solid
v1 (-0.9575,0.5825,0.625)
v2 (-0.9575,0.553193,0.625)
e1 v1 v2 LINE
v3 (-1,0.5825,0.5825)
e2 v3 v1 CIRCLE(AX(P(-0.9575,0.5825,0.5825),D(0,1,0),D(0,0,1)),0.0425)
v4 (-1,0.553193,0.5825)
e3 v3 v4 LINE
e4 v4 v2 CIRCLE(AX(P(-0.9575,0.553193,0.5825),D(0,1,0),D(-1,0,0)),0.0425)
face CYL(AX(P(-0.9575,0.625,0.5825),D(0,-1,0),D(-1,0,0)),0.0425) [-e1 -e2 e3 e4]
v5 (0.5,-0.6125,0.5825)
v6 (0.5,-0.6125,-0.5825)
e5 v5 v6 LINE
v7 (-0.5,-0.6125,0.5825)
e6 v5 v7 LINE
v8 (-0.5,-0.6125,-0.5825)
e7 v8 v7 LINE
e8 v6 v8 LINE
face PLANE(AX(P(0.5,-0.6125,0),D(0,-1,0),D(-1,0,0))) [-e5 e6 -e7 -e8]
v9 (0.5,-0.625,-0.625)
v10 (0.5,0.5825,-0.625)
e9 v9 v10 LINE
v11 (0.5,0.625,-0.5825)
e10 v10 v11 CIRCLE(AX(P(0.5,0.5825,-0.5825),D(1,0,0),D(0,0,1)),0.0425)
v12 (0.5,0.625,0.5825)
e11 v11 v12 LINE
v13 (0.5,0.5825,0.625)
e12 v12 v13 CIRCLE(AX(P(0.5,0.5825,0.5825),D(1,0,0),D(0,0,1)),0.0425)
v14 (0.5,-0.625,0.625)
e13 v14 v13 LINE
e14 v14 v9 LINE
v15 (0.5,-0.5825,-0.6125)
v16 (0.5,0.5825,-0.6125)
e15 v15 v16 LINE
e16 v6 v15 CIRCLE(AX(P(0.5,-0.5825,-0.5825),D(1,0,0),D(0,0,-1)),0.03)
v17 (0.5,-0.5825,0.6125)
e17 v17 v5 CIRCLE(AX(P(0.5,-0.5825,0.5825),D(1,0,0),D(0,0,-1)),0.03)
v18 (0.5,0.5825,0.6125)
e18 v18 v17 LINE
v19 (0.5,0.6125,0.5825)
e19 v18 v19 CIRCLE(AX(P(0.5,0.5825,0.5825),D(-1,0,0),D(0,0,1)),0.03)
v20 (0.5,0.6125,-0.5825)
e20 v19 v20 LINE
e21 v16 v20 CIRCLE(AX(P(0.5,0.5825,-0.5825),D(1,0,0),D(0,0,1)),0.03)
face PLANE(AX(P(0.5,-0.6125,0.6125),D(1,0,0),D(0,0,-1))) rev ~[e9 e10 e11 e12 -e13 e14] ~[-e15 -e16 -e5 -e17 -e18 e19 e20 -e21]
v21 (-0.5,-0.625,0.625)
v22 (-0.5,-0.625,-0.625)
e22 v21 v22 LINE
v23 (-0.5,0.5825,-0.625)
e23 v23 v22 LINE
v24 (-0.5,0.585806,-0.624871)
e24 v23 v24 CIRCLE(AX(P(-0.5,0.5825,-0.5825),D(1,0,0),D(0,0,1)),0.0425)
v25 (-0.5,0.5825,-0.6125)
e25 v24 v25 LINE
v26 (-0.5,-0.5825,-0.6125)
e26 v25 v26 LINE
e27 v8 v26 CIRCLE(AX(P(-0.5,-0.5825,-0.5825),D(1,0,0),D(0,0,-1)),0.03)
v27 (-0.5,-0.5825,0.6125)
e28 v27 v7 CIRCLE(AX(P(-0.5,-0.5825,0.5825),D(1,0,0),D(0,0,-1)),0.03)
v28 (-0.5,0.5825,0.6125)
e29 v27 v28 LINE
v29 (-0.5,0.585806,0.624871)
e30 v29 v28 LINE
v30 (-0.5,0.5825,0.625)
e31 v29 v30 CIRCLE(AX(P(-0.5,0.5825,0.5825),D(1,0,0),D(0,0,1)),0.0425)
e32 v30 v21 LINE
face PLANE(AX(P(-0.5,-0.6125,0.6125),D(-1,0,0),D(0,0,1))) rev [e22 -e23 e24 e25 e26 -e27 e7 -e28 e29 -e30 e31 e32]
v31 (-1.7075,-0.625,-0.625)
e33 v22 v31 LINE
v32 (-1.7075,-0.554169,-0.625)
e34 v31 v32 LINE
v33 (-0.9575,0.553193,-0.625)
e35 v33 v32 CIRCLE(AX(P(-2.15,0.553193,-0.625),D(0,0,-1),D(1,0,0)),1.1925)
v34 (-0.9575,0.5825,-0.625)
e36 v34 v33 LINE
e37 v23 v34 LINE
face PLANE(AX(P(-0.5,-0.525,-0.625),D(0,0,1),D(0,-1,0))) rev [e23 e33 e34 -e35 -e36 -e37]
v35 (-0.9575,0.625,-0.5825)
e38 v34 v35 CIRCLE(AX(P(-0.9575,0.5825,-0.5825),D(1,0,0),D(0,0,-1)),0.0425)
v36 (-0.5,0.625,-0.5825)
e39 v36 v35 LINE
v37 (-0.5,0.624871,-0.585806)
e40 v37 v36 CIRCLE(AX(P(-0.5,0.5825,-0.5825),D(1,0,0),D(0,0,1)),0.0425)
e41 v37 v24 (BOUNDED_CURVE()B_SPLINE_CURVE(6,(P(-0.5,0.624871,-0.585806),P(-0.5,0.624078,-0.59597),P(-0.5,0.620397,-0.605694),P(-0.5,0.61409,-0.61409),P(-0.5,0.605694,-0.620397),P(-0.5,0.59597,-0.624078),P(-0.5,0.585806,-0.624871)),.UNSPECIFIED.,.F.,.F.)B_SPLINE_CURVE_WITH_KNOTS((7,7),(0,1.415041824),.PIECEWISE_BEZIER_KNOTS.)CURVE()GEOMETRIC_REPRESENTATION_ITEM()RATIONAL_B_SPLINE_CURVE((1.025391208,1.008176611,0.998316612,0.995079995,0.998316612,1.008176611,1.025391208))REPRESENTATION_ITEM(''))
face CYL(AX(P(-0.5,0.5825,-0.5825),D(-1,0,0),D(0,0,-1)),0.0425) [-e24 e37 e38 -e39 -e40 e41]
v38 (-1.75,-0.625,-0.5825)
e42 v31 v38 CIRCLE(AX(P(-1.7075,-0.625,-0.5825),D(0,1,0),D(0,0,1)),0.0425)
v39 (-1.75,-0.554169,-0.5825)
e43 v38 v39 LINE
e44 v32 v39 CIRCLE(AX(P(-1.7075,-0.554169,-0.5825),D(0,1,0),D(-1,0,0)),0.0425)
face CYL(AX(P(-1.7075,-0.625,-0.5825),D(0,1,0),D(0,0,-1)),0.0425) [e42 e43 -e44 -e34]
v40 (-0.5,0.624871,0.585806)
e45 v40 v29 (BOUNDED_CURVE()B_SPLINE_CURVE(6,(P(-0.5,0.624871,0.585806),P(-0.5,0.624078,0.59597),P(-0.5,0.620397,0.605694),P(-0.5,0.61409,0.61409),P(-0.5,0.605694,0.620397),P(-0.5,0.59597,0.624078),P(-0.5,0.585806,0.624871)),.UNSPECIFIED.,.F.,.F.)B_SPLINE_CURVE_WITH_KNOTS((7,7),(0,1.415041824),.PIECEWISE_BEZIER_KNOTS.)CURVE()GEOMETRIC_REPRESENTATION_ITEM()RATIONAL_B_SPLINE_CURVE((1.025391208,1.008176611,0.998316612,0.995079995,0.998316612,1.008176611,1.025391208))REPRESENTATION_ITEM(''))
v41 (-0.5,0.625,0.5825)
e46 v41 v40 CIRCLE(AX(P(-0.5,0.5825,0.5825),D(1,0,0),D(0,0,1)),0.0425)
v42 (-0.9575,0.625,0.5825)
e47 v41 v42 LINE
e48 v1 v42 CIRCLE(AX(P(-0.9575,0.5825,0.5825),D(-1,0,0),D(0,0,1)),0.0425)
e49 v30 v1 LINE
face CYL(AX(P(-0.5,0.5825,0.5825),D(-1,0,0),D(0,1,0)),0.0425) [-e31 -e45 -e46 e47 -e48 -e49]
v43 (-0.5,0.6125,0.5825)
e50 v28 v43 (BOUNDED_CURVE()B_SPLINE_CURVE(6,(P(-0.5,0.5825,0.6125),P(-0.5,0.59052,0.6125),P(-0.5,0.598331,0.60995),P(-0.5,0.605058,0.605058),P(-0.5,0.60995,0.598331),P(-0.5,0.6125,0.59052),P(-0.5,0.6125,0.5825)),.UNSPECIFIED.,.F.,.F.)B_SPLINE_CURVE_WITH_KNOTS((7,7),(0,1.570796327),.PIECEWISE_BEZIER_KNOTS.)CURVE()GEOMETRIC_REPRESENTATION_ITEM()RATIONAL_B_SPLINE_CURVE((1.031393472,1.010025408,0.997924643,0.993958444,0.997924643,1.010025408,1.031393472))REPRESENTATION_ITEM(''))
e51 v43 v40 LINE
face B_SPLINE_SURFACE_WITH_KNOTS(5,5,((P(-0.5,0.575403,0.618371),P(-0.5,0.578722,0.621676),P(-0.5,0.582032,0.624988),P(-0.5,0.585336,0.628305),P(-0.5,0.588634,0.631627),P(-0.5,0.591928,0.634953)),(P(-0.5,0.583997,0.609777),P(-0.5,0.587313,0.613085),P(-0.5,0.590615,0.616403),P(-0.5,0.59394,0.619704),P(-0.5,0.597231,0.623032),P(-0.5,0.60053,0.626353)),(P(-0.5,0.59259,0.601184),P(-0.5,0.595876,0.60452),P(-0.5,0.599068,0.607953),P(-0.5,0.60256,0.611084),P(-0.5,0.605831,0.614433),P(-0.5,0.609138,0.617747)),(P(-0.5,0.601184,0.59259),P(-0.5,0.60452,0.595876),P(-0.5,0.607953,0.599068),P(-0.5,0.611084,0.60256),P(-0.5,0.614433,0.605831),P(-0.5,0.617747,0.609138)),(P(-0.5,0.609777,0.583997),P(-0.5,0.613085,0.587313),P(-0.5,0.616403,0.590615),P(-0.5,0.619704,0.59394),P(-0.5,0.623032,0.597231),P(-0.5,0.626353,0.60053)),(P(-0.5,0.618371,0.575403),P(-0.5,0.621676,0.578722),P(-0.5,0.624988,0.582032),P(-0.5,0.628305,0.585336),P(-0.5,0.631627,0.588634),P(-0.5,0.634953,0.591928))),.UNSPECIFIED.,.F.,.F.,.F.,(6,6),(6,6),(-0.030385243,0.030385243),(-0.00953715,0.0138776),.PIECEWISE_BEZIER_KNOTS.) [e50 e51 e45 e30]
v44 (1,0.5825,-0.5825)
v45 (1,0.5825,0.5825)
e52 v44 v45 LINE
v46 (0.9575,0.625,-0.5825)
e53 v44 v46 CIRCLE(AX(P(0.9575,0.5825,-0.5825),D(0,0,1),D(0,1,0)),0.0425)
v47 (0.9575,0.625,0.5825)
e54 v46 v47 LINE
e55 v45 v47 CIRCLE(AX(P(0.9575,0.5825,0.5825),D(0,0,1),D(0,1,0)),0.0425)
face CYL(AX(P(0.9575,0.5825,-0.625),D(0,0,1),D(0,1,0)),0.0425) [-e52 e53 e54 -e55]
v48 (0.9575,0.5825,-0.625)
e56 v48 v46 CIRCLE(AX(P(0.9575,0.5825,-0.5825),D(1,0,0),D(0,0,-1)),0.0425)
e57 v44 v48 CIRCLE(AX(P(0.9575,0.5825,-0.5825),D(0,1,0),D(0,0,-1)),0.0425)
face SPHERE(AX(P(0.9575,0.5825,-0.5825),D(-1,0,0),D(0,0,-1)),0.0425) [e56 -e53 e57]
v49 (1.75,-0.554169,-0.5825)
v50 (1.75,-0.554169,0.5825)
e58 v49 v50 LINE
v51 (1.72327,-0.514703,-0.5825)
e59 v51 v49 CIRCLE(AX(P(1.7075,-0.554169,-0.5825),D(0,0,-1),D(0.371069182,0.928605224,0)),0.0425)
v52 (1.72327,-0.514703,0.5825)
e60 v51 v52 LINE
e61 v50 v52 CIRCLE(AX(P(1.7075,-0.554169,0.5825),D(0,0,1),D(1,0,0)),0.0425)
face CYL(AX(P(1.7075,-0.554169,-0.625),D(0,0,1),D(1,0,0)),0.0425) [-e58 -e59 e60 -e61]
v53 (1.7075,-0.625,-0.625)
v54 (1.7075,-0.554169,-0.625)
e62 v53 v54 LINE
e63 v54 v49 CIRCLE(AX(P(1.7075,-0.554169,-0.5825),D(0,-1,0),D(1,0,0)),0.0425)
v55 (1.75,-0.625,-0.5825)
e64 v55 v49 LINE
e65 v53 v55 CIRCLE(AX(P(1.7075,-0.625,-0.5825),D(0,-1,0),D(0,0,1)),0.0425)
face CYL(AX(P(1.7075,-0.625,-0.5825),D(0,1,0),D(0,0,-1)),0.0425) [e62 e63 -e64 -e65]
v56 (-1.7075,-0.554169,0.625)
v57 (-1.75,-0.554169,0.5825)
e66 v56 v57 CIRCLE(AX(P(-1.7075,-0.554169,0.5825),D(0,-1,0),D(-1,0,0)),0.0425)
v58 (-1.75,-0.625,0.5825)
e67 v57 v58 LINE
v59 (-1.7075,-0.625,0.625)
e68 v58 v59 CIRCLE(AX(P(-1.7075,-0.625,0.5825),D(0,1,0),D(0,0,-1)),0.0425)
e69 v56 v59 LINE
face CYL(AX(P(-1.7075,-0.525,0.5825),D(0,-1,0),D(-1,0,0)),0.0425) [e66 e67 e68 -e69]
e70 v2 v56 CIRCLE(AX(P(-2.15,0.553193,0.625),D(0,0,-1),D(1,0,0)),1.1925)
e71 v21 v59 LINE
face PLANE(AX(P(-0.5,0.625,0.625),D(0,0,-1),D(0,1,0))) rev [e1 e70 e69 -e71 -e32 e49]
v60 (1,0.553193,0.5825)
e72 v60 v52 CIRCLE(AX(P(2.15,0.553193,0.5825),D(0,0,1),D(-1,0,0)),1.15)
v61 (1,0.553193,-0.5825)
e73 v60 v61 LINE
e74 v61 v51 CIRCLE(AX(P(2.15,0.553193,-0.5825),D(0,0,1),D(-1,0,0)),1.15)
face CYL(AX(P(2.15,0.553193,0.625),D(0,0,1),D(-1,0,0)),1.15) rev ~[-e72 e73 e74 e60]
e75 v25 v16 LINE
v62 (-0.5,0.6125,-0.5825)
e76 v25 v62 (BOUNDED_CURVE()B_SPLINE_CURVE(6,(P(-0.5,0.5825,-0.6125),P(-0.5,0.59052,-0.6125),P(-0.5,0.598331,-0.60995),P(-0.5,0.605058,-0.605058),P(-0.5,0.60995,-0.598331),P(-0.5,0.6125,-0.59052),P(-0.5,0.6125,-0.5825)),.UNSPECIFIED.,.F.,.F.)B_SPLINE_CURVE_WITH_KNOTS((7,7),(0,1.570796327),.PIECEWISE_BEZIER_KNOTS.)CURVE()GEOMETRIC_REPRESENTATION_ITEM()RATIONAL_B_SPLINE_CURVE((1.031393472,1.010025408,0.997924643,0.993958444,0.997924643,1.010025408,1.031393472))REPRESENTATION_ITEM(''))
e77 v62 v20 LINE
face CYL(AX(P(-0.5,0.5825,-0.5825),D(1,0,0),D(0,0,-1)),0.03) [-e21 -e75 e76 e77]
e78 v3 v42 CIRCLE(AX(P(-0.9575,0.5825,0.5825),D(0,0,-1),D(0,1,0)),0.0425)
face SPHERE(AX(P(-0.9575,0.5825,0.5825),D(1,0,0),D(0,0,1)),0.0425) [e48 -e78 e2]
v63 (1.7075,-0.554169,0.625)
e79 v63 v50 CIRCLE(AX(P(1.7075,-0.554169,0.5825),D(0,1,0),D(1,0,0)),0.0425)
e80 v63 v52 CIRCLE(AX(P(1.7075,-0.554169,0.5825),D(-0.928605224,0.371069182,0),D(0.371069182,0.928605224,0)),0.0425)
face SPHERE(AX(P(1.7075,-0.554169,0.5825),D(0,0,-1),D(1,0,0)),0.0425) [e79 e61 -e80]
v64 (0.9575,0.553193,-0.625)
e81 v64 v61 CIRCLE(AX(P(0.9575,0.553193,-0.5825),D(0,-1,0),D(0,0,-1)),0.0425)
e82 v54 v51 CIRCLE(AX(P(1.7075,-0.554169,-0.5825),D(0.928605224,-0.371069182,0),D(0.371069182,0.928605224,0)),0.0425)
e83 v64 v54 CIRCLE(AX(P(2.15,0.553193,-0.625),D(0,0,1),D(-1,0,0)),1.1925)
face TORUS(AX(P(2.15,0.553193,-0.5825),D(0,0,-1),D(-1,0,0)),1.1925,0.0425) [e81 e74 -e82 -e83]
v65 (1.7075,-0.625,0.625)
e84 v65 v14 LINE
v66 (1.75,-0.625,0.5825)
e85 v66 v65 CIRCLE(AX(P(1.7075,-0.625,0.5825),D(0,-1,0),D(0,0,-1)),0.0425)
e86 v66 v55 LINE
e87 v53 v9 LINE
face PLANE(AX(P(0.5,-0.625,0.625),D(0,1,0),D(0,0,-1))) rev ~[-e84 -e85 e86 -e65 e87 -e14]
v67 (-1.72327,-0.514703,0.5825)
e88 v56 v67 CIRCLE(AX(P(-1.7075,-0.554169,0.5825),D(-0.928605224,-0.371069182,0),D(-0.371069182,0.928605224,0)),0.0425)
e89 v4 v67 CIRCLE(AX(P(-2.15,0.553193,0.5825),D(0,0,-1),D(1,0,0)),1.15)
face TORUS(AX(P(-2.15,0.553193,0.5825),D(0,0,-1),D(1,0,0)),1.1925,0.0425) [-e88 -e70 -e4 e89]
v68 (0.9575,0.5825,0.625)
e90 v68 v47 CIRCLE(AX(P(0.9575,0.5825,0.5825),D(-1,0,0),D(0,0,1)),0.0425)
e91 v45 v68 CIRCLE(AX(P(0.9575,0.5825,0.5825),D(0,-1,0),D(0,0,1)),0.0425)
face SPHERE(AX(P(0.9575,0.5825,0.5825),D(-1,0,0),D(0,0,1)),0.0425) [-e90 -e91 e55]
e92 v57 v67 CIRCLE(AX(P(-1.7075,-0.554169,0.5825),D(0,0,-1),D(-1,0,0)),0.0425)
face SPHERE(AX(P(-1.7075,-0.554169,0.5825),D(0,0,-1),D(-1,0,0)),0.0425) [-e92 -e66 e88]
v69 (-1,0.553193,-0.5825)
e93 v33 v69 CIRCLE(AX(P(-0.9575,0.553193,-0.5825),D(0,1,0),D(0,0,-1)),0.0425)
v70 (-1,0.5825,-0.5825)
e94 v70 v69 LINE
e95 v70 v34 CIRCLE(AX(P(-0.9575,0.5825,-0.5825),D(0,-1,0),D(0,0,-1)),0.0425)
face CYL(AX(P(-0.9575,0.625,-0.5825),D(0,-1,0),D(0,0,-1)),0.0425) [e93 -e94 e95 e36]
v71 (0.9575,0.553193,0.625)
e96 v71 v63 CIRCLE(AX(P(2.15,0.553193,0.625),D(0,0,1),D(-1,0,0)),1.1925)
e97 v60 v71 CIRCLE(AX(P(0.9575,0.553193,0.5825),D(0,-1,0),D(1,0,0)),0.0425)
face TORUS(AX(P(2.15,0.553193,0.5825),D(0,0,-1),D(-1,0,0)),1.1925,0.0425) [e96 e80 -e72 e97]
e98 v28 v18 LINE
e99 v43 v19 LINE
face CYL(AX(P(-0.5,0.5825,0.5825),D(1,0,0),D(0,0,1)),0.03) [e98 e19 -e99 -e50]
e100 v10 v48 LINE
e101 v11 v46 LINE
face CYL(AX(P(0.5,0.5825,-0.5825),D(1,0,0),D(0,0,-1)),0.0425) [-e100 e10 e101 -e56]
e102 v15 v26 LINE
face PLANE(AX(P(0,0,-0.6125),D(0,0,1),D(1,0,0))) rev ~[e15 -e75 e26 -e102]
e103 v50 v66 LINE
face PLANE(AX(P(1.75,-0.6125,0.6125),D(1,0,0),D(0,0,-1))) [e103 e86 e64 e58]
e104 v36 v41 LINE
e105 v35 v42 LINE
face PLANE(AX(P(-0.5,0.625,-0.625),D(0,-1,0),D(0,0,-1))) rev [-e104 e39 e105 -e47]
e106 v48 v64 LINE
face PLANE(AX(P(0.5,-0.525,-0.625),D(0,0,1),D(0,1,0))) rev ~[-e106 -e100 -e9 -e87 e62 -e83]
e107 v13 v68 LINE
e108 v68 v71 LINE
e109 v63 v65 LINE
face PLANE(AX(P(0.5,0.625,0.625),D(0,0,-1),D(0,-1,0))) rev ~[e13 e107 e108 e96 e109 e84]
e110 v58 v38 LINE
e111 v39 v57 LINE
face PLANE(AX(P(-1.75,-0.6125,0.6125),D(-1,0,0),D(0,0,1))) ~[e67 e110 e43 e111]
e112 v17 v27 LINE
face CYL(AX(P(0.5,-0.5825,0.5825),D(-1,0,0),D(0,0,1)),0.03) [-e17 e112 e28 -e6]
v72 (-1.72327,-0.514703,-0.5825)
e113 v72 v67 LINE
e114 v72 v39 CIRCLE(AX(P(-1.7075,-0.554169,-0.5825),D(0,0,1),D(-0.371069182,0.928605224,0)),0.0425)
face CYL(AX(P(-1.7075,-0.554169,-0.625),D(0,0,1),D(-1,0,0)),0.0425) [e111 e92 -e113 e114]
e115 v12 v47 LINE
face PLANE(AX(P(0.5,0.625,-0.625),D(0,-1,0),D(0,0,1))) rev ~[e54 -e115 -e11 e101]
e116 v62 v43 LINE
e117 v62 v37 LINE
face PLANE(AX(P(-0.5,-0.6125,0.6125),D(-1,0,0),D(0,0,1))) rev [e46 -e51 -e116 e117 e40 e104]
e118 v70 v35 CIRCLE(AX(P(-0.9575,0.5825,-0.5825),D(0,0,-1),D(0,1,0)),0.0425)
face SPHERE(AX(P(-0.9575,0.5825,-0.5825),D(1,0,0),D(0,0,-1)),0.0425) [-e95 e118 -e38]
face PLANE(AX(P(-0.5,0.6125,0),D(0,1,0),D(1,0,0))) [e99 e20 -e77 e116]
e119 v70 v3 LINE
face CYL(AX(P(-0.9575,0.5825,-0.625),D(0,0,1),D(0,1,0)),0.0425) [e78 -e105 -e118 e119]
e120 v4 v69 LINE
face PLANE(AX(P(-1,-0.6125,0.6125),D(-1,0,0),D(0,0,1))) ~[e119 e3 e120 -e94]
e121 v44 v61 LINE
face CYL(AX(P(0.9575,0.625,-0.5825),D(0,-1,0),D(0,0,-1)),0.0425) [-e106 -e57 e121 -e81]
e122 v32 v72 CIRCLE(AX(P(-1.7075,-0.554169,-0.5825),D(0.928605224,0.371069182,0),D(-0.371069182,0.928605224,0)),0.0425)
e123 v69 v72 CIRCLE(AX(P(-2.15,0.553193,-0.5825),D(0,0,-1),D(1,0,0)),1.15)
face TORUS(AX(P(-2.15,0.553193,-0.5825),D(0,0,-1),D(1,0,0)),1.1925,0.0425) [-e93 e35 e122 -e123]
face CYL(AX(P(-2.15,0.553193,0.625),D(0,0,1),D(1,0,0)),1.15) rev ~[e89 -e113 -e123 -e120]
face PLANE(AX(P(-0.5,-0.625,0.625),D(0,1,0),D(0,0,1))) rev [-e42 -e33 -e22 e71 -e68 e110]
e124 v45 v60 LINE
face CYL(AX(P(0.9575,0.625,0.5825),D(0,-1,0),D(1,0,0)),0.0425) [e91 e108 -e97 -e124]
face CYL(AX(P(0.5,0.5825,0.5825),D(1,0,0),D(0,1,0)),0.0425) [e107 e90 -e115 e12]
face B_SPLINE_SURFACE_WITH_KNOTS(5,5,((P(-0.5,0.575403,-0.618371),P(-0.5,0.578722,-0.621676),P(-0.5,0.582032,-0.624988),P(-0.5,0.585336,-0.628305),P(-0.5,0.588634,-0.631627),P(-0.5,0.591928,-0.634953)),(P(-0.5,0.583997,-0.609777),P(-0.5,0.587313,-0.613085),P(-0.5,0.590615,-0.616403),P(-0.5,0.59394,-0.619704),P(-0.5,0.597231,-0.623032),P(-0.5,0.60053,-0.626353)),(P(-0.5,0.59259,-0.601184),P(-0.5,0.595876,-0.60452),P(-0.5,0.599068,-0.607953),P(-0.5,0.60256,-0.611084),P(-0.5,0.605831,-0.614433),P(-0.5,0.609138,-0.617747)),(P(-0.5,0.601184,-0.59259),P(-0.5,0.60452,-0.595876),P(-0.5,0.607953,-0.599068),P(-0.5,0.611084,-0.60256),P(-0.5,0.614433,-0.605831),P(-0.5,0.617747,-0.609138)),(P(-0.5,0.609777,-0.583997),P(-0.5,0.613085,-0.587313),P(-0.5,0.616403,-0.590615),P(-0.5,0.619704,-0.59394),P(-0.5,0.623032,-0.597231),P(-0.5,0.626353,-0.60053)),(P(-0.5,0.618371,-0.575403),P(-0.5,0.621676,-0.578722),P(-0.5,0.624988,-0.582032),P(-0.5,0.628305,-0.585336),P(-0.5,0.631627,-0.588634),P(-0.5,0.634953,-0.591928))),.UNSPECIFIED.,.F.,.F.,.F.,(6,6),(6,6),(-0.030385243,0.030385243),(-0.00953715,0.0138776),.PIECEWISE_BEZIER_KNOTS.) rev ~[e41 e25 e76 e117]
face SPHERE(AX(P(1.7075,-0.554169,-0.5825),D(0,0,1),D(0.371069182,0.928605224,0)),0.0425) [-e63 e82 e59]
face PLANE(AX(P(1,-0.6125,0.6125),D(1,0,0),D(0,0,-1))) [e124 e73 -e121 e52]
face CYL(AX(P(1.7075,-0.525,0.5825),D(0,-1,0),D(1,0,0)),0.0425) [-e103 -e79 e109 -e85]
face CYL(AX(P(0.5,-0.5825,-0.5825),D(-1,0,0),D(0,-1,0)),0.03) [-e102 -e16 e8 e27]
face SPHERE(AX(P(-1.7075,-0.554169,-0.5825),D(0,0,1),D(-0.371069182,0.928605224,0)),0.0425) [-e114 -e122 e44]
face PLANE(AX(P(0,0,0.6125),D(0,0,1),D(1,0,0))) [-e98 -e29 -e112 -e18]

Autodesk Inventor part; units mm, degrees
ref_plane "YZ Plane" through (0, 0, 0) normal (1, 0, 0) x (0, 1, 0)
ref_plane "XZ Plane" through (0, 0, 0) normal (0, 1, 0) x (-1, 0, 0)
ref_plane "XY Plane" through (0, 0, 0) normal (0, 0, 1) x (1, 0, 0)
sketch "Sketch10" plane through (0, 0, 0) normal (0, 0, 1) x (1, 0, 0)
  line L0 (-0.5, 0.6125) -> (0.5, 0.6125)
  line L1 (0.5, 0.6125) -> (0.5, -0.6125)
  line L2 (0.5, -0.6125) -> (-0.5, -0.6125)
  line L3 (-0.5, -0.6125) -> (-0.5, 0.6125)
  point P0 (0, 0)
  point P1 (-0.5, 0)
  point P2 (0, 0.6125)
  dimension "d7" = 1
  dimension "d8" = 1.225
extrude "Extrusion4" add sketch "Sketch10" along normal mid plane 1.225
sketch "Sketch11" plane through (0.5, -0.6125, 0.6125) normal (1, 0, 0) x (0, 0, -1)
  line L0 (0, 1.225) -> (1.225, 1.225) construction
  line L1 (0, 0) -> (0, 1.225) construction
  line L2 (0, 0) -> (1.225, 0) construction
  line L3 (1.225, 1.225) -> (1.225, 0) construction
  line L4 (1.2375, 1.2375) -> (-0.0125, 1.2375)
  line L5 (-0.0125, 1.2375) -> (-0.0125, -0.0125)
  line L6 (-0.0125, -0.0125) -> (1.2375, -0.0125)
  line L7 (1.2375, -0.0125) -> (1.2375, 1.2375)
  line L8 (-0.0125, -0.0125) -> (1.2375, -0.0125)
  line L9 (1.2375, -0.0125) -> (1.2375, 0.0875)
  line L10 (1.2375, 0.0875) -> (-0.0125, 0.0875)
  line L11 (-0.0125, 0.0875) -> (-0.0125, -0.0125)
  point P0 (0.6125, 0.6125)
  dimension "d11" = 1.25
  dimension "d14" = 0.1
extrude "Extrusion5" add sketch "Sketch11" along normal blind 0.5
extrude "Extrusion6" add sketch "Sketch11" along normal blind 1.25 contours L7 L6 L5 L10
fillet "Fillet1" radius 1.15 1 edges at (1, -0.525, 0)
fillet "Fillet2" radius 0.0425 10 edges at (0.75, 0.625, -0.625) (0.75, 0.625, 0.625) (1, 0.5891, 0.625) (1.2059, -0.1035, 0.625) (1, 0.5891, -0.625) (1.2059, -0.1035, -0.625) (1.75, -0.575, -0.625) (1.75, -0.525, 0) (1, 0.625, 0) (1.75, -0.575, 0.625)
mirror "Mirror1" about plane through (0, 0, 0) normal (1, 0, 0) of "Extrusion5", "Fillet1", "Fillet2", "Extrusion6"
fillet "Fillet3" radius 0.03 4 edges at (0, 0.6125, -0.6125) (0, 0.6125, 0.6125) (0, -0.6125, -0.6125) (0, -0.6125, 0.6125)
properties part number "C0805C472KDRACTU Capacitor" material "Laminate, Ivory, Matte"
